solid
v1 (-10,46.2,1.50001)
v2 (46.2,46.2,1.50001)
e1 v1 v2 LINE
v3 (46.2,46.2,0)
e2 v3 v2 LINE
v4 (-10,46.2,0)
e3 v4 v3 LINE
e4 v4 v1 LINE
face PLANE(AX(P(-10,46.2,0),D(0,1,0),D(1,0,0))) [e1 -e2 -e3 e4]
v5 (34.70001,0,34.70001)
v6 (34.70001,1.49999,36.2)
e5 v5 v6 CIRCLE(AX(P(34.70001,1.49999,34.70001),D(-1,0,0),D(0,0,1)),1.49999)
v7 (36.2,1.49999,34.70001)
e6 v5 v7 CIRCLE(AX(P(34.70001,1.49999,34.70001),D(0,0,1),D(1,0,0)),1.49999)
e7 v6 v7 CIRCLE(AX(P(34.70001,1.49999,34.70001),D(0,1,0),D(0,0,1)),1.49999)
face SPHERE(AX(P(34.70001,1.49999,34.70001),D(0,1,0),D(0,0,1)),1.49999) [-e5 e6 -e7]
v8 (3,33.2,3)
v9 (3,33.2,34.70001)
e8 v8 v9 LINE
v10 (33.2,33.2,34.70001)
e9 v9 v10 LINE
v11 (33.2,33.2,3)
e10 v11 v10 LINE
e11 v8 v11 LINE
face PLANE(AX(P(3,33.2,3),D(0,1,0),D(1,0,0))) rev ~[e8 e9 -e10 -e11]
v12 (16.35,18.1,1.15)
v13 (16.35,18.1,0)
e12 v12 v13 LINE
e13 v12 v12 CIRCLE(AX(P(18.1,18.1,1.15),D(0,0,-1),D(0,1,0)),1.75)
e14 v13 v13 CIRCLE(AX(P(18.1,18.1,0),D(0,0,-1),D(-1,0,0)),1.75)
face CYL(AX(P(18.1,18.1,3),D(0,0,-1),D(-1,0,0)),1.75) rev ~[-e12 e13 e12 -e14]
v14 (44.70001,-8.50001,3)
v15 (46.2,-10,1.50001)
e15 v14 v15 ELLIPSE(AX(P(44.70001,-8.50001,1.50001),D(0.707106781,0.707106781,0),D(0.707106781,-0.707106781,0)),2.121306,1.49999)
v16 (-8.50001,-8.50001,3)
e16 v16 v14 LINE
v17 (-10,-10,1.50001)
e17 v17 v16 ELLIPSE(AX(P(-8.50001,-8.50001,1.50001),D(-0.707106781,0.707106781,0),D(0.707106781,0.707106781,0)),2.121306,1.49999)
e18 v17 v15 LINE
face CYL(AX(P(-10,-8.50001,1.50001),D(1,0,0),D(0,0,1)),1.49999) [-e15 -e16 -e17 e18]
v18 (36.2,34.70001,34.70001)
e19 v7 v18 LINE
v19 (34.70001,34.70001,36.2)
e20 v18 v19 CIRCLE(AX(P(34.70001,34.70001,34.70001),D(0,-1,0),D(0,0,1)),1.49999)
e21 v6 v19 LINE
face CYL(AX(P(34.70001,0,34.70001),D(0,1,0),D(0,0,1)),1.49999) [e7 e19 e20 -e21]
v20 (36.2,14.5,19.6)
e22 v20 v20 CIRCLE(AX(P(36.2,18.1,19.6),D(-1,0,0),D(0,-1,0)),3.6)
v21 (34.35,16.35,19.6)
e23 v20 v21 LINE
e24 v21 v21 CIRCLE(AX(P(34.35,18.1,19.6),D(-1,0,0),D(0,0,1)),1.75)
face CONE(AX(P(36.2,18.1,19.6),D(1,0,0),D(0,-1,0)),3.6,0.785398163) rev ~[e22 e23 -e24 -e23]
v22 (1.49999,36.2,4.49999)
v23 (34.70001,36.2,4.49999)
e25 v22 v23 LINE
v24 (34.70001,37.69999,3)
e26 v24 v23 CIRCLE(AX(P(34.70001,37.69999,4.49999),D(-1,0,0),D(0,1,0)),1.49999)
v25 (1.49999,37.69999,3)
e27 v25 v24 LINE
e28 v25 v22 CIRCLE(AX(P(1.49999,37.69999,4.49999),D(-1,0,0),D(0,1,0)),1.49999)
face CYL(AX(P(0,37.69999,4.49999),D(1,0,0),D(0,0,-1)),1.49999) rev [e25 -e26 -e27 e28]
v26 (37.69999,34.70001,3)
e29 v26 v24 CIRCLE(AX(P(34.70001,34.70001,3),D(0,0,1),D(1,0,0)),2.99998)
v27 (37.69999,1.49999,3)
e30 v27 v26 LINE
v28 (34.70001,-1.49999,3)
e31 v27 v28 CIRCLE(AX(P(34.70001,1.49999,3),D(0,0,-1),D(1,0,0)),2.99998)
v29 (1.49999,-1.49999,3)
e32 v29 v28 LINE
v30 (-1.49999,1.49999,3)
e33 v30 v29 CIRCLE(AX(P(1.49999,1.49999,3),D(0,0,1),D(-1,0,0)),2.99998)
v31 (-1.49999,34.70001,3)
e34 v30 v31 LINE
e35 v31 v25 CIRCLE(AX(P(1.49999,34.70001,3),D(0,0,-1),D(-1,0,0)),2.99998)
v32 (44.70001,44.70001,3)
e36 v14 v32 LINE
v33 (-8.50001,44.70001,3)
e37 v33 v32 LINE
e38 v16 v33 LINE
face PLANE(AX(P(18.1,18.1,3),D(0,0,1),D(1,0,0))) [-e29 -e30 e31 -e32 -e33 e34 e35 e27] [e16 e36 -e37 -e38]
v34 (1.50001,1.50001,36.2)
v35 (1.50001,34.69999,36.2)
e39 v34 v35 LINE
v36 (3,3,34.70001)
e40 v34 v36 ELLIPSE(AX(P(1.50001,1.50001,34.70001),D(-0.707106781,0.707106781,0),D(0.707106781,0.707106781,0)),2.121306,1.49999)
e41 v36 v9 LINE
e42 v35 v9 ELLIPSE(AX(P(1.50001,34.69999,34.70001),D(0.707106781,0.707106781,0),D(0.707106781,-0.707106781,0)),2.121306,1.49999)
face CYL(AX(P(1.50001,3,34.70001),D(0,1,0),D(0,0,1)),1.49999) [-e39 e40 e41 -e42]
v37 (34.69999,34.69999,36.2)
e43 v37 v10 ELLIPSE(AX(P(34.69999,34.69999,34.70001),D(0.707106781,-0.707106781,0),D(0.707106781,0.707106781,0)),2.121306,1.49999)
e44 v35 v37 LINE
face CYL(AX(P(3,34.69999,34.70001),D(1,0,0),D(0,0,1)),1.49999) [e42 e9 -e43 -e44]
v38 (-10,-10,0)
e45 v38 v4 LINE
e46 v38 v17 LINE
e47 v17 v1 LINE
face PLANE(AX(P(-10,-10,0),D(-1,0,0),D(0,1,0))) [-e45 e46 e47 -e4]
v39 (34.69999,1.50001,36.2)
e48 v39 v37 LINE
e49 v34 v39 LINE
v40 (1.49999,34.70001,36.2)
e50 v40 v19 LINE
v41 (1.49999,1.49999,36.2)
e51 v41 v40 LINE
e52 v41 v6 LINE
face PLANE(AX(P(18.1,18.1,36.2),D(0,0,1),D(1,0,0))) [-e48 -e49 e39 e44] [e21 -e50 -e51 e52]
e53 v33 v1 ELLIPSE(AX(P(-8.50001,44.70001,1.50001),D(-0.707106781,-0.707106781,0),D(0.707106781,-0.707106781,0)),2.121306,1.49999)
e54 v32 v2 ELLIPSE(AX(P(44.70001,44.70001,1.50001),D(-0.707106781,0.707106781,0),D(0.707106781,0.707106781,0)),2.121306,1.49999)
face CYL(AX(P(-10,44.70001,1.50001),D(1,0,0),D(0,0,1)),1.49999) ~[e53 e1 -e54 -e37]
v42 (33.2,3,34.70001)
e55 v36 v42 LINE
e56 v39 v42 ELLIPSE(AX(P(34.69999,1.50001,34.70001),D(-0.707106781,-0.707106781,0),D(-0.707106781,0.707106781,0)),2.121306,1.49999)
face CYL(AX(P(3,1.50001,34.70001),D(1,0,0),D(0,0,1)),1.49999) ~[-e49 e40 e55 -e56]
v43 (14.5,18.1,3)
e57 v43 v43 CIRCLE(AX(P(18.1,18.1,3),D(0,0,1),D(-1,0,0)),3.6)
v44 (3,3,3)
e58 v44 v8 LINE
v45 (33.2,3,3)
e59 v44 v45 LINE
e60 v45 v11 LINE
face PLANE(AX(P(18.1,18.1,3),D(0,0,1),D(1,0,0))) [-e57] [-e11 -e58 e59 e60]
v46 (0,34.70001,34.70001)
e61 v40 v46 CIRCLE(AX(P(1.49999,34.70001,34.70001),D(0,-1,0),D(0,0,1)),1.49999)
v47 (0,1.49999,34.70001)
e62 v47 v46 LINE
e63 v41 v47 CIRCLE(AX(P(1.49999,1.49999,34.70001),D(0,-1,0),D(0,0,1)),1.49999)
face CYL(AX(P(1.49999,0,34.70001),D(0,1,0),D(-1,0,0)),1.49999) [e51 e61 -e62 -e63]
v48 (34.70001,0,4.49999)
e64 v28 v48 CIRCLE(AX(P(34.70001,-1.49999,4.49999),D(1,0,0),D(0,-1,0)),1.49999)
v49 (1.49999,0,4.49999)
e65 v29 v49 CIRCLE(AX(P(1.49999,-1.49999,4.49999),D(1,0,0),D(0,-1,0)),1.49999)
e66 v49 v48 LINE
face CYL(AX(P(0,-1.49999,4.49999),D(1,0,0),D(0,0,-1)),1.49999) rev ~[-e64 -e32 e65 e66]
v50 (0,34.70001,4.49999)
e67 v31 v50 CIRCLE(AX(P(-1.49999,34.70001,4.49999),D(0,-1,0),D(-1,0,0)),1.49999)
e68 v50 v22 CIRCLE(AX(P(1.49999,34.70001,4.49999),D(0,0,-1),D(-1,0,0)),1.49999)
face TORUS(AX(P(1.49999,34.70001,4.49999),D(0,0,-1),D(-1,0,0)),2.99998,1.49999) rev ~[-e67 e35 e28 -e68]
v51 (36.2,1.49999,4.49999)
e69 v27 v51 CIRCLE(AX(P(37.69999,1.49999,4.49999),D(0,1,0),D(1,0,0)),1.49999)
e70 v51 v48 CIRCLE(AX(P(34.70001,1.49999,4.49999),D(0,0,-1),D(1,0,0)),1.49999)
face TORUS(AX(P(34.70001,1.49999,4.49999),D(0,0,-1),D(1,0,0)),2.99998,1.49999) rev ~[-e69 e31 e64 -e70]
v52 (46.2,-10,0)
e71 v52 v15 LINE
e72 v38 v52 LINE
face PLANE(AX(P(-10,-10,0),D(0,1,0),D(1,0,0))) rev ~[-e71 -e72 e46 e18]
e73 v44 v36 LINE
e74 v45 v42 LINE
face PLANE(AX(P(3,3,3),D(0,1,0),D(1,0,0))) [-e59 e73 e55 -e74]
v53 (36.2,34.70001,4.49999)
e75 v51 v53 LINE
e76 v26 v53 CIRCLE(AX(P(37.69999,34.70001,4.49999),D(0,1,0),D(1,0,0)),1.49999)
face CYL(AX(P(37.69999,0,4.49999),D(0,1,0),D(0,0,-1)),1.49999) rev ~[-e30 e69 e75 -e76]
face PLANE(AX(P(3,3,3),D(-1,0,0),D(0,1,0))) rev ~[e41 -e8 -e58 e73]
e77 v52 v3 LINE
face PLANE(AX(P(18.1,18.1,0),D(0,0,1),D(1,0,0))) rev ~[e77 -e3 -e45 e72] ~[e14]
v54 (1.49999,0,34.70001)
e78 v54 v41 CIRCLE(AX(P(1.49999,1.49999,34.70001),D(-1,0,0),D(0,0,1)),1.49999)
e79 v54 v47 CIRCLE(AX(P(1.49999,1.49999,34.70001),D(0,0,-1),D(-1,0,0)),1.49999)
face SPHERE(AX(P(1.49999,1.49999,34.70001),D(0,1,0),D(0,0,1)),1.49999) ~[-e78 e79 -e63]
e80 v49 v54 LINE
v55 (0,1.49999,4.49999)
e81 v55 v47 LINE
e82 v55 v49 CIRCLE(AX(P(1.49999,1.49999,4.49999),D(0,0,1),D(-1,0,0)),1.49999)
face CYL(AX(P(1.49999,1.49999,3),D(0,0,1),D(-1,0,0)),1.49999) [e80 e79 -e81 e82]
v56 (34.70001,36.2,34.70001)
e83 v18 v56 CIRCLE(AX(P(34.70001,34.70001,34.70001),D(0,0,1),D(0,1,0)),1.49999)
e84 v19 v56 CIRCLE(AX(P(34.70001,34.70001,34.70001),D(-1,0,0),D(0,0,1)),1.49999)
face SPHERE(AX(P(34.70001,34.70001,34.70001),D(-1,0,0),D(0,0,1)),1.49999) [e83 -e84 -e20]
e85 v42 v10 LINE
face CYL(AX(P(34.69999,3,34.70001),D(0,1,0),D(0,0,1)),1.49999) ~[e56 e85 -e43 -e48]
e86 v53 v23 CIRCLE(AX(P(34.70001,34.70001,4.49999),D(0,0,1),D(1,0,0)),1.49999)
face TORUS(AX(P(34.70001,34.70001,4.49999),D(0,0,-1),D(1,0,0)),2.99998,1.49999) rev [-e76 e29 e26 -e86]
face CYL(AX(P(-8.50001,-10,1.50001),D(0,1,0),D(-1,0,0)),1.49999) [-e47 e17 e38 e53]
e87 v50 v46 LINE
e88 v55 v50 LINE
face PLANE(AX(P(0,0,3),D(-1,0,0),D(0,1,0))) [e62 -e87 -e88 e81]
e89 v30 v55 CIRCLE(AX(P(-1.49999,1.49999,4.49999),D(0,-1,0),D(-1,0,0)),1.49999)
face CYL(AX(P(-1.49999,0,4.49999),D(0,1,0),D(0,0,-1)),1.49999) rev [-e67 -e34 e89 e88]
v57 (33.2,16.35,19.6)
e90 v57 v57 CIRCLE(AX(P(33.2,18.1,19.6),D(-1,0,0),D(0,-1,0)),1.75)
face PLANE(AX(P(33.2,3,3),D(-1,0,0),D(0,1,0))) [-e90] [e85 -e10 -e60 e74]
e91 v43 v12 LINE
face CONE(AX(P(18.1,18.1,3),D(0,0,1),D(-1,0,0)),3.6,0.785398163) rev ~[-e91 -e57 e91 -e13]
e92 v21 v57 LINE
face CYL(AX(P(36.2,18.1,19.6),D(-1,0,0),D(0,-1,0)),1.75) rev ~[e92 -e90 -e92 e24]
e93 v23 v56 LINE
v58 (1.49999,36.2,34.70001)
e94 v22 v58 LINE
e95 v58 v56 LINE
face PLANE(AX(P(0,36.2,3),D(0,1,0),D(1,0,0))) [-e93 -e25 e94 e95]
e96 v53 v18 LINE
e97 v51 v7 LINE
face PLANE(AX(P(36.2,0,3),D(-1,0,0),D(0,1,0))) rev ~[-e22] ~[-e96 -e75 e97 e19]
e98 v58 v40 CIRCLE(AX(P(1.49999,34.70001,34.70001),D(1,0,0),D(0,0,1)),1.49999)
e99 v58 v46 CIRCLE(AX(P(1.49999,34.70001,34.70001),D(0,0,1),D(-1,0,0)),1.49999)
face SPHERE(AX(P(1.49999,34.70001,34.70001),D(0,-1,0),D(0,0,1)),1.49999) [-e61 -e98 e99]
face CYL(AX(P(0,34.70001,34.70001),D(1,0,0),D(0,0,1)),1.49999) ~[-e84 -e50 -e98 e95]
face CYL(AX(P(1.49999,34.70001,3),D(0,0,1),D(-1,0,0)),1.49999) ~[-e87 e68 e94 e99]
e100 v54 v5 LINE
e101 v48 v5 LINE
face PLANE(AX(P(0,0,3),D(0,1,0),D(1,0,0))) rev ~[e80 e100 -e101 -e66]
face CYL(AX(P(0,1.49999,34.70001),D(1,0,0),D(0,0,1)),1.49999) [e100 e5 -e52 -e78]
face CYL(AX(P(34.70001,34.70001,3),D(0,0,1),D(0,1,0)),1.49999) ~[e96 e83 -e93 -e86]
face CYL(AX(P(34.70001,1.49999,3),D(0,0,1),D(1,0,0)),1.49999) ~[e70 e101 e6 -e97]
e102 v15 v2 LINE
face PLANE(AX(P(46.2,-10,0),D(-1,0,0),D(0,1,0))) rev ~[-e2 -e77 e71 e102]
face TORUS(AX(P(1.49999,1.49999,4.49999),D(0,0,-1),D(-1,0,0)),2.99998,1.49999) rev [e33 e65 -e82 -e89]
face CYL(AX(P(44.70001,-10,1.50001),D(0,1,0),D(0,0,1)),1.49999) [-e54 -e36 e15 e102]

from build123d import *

# Parameters (mm, degrees)
F0_W           = 56.2
F0_H           = 56.2
F1_DEPTH       = 3
F2_W           = 36.2
F2_H           = 36.2
F2_W_2         = 30.2
F2_H_2         = 30.2
F3_DEPTH       = 33.2
F4_D           = 3.5
F4_DEPTH       = 13.5
F4_CSINK_D     = 7.2
F4_CSINK_ANGLE = 90
F4_TIP         = 1.0515060833
F5_R           = 1.49999
F7_D           = 3.5
F7_DEPTH       = 13.5
F7_CSINK_D     = 7.2
F7_CSINK_ANGLE = 90
F7_TIP         = 1.0515060833


# Not quite as in the source:
# - a fillet or chamfer is up to 0.001 mm smaller than in the source, because OpenCascade refuses the exact size
# - a feature names something its author has since deleted; it is built from what else it names


with BuildPart() as f1:
    # F0 (on Top) → F1 (new body)
    with BuildSketch(Plane.XY):
        with Locations((18.1, 18.1)):
            Rectangle(F0_W, F0_H)
    extrude(amount=F1_DEPTH)

    # F2 (on face) → F3 (join)
    with BuildSketch(Plane.XY.offset(3)):
        with Locations((18.1, 18.1)):
            Rectangle(F2_W, F2_H)
        with Locations((18.1, 18.1)):
            Rectangle(F2_W_2, F2_H_2, mode=Mode.SUBTRACT)
    extrude(amount=F3_DEPTH)

    # F4
    with Locations(Plane.XY.offset(3)):
        with Locations((18.1, 18.1)):
            CounterSinkHole(F4_D / 2, F4_CSINK_D / 2, depth=F4_DEPTH, counter_sink_angle=F4_CSINK_ANGLE)
            with Locations((0, 0, -(F4_DEPTH + F4_TIP / 2))):  # 118° drill point
                Cone(0, F4_D / 2, F4_TIP, mode=Mode.SUBTRACT)

    # F5 (radius 1.5 in the source; OpenCascade refuses exactly that, so slightly less here)
    f5_edges = [f1.edges().sort_by_distance(p)[0] for p in [
        (33.2, 18.1, 36.2),
        (18.1, 3, 36.2),
        (18.1, 0, 3),
        (18.1, 33.2, 36.2),
        (3, 18.1, 36.2),
        (0, 18.1, 36.2),
        (18.1, 36.2, 36.2),
        (36.2, 18.1, 36.2),
        (18.1, 0, 36.2),
        (36.2, 0, 19.6),
        (0, 0, 19.6),
        (0, 18.1, 3),
        (18.1, 36.2, 3),
        (36.2, 36.2, 19.6),
        (0, 36.2, 19.6),
        (18.1, 46.2, 3),
        (-10, 18.1, 3),
        (18.1, -10, 3),
        (46.2, 18.1, 3),
        (36.2, 18.1, 3),
    ]]
    fillet(f5_edges, radius=F5_R)

    # F7
    with Locations(Plane.YZ.offset(36.2)):
        with Locations((18.1, 19.6)):
            CounterSinkHole(F7_D / 2, F7_CSINK_D / 2, depth=F7_DEPTH, counter_sink_angle=F7_CSINK_ANGLE)
            with Locations((0, 0, -(F7_DEPTH + F7_TIP / 2))):  # 118° drill point
                Cone(0, F7_D / 2, F7_TIP, mode=Mode.SUBTRACT)


solid = f1.part
